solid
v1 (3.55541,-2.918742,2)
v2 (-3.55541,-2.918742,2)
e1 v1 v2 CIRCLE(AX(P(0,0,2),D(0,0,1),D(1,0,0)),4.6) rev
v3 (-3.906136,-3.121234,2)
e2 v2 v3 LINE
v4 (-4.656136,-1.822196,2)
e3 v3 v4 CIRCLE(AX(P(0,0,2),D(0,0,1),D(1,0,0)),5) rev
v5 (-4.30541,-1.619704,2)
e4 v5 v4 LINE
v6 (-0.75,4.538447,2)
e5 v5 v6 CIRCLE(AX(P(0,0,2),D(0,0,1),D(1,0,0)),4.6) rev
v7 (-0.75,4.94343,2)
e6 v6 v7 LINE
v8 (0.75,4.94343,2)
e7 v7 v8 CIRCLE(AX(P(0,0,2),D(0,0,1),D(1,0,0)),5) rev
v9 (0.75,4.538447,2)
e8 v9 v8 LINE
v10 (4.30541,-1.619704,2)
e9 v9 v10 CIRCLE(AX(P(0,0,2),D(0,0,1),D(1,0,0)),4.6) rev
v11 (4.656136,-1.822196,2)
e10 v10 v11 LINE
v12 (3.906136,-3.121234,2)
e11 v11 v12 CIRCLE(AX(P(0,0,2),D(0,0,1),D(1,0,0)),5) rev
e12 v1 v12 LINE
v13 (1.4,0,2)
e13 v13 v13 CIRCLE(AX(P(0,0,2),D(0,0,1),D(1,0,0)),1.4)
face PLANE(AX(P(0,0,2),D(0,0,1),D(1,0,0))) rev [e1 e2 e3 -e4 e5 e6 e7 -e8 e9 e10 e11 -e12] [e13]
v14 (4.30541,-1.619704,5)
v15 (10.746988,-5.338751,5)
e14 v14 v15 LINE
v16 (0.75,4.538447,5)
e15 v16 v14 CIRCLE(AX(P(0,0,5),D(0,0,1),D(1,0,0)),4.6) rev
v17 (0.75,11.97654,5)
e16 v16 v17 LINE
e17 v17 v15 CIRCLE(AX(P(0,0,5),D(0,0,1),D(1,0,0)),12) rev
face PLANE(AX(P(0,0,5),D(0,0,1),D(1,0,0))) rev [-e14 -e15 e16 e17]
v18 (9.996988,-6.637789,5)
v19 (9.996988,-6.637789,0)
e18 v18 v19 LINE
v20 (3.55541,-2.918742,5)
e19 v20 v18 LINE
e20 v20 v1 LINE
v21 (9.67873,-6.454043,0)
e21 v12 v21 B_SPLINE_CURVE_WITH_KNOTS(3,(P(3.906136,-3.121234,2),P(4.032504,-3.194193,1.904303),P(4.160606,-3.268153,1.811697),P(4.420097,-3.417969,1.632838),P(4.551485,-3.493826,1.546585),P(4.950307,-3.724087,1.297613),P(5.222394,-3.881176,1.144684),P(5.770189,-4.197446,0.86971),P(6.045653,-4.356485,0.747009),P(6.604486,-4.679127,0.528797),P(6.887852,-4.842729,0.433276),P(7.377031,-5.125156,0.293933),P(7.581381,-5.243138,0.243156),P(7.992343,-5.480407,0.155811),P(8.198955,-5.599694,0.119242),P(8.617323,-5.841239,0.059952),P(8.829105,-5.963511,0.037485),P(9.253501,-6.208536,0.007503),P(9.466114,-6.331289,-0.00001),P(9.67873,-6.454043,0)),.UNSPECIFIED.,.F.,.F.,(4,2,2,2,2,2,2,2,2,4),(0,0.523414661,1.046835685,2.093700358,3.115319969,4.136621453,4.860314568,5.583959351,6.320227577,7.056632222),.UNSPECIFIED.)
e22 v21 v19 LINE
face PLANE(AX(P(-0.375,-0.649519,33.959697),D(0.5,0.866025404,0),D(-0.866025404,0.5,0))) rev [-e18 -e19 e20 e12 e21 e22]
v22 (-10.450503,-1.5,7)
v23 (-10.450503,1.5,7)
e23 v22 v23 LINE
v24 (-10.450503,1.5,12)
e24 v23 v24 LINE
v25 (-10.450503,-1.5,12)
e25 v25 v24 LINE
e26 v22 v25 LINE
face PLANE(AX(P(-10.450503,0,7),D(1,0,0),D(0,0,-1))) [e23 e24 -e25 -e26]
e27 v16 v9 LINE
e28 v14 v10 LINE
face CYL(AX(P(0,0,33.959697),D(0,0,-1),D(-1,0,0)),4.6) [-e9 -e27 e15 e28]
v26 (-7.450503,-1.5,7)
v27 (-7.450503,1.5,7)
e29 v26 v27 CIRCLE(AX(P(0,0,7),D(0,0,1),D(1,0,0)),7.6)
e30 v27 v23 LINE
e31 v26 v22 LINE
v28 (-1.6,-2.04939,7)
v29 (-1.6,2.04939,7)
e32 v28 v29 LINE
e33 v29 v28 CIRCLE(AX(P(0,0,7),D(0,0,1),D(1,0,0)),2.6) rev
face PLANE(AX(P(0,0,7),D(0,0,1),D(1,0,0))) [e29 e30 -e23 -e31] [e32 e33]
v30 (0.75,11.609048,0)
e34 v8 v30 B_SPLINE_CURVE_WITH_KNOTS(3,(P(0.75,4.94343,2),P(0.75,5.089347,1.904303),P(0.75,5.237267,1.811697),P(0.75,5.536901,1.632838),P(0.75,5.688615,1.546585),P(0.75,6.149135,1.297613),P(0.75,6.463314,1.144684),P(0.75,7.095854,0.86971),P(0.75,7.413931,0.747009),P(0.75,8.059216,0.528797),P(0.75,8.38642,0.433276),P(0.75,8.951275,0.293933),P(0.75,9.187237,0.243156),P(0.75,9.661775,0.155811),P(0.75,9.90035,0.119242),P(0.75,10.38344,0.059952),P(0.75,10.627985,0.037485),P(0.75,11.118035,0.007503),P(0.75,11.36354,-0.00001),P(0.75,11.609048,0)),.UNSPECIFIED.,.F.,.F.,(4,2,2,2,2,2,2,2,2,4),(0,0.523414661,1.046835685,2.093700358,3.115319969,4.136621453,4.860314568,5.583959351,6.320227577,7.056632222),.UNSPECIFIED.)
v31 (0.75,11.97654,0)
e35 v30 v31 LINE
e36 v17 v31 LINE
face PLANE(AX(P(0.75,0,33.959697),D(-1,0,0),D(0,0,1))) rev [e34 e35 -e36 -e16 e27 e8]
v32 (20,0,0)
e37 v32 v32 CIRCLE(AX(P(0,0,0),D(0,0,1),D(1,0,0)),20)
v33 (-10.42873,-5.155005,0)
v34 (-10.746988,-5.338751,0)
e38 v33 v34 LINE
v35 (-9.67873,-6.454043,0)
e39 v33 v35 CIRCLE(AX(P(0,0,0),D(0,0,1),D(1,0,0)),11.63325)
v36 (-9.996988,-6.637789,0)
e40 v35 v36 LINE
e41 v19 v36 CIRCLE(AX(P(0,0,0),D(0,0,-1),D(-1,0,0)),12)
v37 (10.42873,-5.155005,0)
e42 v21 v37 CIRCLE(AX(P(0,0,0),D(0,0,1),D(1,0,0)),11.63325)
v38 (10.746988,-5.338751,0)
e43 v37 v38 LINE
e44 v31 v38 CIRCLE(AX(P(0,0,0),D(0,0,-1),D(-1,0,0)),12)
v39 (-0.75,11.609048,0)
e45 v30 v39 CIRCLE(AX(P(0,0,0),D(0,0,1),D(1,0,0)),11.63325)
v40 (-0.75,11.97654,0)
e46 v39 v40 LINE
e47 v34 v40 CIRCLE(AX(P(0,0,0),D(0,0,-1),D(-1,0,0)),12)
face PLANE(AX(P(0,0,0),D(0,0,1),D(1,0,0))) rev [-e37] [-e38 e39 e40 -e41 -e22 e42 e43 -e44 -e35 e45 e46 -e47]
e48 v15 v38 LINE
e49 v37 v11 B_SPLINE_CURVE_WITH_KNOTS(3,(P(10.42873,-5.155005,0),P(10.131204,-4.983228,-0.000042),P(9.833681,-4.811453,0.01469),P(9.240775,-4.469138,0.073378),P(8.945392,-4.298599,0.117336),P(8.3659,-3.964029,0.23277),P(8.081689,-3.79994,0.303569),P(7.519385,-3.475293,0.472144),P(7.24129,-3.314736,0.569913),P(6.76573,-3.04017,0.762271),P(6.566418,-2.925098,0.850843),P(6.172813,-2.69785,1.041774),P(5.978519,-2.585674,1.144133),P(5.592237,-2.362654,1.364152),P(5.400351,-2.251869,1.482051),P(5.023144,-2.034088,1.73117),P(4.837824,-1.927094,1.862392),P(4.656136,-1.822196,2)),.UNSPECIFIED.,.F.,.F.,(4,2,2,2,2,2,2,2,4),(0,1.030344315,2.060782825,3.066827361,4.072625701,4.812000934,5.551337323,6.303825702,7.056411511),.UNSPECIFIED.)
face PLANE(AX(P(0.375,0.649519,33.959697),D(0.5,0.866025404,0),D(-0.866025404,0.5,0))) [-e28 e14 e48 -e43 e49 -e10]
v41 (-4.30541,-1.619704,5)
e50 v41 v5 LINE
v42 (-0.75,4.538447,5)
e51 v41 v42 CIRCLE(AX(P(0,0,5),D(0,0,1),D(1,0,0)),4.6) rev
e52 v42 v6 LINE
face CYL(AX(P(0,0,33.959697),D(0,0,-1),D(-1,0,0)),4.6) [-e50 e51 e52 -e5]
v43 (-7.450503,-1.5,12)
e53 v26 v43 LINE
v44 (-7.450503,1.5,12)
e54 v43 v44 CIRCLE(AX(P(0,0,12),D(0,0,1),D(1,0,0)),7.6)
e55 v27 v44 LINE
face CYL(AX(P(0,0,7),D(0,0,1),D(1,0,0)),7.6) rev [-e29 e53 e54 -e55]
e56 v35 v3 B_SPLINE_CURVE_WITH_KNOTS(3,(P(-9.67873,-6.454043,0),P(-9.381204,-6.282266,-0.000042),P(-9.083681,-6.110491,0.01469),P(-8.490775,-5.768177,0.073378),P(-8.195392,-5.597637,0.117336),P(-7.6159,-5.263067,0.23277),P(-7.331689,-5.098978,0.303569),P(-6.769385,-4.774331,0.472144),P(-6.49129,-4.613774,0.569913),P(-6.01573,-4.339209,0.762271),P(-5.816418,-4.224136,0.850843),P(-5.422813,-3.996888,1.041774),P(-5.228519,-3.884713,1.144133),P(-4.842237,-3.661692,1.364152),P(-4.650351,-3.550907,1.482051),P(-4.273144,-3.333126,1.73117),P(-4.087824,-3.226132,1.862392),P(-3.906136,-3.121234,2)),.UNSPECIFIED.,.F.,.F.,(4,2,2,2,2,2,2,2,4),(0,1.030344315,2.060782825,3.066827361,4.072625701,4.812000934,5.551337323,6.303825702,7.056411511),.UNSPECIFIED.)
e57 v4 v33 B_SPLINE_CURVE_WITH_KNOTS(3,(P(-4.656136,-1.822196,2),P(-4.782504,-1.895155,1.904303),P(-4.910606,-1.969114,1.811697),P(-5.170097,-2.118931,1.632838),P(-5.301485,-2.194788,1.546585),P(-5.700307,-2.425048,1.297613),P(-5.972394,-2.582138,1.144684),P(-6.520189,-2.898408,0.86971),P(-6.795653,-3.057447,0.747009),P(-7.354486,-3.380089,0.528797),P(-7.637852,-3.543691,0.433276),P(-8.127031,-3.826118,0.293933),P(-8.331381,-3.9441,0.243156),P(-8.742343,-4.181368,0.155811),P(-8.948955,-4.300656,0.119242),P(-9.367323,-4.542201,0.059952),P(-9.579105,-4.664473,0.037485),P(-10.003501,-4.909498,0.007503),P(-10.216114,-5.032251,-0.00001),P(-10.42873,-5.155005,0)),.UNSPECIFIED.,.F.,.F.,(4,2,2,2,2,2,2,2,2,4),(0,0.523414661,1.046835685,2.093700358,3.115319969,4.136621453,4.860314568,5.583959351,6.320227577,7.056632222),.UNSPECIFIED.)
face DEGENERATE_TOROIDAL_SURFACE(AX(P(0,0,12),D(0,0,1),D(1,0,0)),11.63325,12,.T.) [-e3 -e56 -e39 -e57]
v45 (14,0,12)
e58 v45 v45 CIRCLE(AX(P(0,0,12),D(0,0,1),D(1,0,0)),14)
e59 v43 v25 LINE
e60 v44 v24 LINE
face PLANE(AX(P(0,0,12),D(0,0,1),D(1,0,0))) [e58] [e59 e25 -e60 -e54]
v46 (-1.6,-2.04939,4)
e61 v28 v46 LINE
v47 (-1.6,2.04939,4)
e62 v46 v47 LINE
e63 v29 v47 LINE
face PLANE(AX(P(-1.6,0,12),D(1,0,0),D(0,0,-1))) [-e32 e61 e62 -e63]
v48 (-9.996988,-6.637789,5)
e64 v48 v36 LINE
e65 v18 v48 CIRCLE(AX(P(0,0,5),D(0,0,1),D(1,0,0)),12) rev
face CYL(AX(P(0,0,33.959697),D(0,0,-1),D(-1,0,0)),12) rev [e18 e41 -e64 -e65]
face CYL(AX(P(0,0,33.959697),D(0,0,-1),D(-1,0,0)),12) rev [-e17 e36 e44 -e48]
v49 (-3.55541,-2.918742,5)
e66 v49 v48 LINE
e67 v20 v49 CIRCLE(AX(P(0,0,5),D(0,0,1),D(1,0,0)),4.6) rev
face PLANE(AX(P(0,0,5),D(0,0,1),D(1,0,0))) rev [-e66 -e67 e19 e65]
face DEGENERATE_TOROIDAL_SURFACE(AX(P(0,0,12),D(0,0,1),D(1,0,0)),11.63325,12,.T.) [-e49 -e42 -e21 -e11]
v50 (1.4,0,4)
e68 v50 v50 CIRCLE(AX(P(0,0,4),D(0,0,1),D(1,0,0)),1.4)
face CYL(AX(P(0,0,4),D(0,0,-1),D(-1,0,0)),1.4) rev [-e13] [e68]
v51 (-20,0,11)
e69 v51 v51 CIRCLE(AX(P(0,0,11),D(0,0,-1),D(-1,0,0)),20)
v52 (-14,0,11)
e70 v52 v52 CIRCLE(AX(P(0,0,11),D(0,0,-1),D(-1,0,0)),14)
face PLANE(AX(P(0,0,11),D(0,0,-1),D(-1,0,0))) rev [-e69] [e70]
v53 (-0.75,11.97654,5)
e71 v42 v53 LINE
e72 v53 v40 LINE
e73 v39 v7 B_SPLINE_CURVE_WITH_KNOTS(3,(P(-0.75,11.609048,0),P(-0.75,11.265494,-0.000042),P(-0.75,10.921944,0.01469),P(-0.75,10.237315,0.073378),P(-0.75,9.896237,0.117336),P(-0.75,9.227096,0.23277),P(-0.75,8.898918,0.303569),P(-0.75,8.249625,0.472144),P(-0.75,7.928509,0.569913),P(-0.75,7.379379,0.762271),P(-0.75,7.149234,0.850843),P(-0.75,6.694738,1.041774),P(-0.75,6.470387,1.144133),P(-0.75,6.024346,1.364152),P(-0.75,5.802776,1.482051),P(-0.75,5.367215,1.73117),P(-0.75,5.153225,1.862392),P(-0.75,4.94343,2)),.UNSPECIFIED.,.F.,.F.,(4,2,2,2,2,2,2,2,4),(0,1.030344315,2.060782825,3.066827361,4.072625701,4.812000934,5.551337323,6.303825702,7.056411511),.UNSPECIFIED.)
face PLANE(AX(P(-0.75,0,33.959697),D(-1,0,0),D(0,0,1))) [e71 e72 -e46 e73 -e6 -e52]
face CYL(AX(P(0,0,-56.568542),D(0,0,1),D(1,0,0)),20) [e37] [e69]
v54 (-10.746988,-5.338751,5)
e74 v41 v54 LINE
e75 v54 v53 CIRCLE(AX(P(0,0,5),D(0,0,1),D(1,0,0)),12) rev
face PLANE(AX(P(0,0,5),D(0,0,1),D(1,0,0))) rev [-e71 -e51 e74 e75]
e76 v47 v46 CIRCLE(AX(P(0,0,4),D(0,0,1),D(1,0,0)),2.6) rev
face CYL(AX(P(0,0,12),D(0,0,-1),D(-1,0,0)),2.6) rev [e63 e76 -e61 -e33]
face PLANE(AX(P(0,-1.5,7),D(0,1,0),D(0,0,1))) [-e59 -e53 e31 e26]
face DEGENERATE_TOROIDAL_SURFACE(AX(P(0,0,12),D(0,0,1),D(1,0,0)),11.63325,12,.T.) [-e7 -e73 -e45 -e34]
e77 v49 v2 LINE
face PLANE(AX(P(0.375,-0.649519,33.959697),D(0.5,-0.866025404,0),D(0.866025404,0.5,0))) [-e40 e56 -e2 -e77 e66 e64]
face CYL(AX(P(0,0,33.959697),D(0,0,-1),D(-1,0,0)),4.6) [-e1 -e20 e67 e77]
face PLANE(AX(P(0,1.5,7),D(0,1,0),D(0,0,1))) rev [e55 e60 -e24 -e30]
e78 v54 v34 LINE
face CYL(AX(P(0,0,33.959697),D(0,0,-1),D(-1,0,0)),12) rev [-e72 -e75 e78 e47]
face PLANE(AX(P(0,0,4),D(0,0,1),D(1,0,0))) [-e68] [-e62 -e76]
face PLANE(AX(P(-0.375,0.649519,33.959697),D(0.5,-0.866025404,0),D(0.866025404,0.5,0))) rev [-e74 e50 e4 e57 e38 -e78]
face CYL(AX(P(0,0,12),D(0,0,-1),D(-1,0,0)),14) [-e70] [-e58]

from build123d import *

# Parameters (mm, degrees)
SKETCH_1_R          = 13
SKETCH_1_R_2        = 2.6
SKETCH_1_R_3        = 1.4
EXTRUDE_1_DEPTH     = 4
SKETCH_1_3_R        = 13
SKETCH_1_3_R_2      = 2.6
EXTRUDE_2_DEPTH     = 12
EXTRUDE_START       = 11
SKETCH_1_6_R        = 14
SKETCH_1_6_R_2      = 13
EXTRUDE_3_DEPTH     = 1
CUT_EXTRUDE_1_DEPTH = 5
SKETCH_6_R          = 7.6
SKETCH_6_W          = 3
SKETCH_6_H          = 3
CUT_EXTRUDE_5_DEPTH = 5
SKETCH_5_R          = 5
CUT_EXTRUDE_6_DEPTH = 2
FILLET_1_R          = 12
SKETCH_7_R          = 20
SKETCH_7_R_2        = 13
EXTRUDE_5_DEPTH     = 11


with BuildPart() as part:
    # 草图1 → 凸台-拉伸1 (new body)
    # profile 1 of 3: a face of its own
    with BuildSketch(Plane.XY):
        Circle(SKETCH_1_R)
        Circle(SKETCH_1_R_2, mode=Mode.SUBTRACT)
    # profile 2 of 3: a face of its own
    with BuildSketch(Plane.XY):
        with BuildLine():
            Line((-1.6, -2.049390153), (-1.6, 2.049390153))
            ThreePointArc((-1.6, 2.049390153), (-2.6, 0), (-1.6, -2.049390153))
        make_face()
    # profile 3 of 3: a face of its own
    with BuildSketch(Plane.XY):
        with BuildLine():
            ThreePointArc((2.6, 0), (1.140175425, 2.336664289), (-1.6, 2.049390153))
            Line((-1.6, 2.049390153), (-1.6, -2.049390153))
            ThreePointArc((-1.6, -2.049390153), (1.140175425, -2.336664289), (2.6, 0))
        make_face()
        Circle(SKETCH_1_R_3, mode=Mode.SUBTRACT)
    extrude(amount=EXTRUDE_1_DEPTH)

    # 草图1<3> → 凸台-拉伸2 (add)
    # profile 1 of 2: a face of its own
    with BuildSketch(Plane.XY):
        Circle(SKETCH_1_3_R)
        Circle(SKETCH_1_3_R_2, mode=Mode.SUBTRACT)
    # profile 2 of 2: a face of its own
    with BuildSketch(Plane.XY):
        with BuildLine():
            Line((-1.6, -2.049390153), (-1.6, 2.049390153))
            ThreePointArc((-1.6, 2.049390153), (-2.6, 0), (-1.6, -2.049390153))
        make_face()
    extrude(amount=EXTRUDE_2_DEPTH)

    # 草图1<6> → 凸台-拉伸3 (add)
    with BuildSketch(Plane.XY.offset(EXTRUDE_START)):
        Circle(SKETCH_1_6_R)
        Circle(SKETCH_1_6_R_2, mode=Mode.SUBTRACT)
    extrude(amount=EXTRUDE_3_DEPTH)

    # 草图3 → 切除-拉伸1 (cut)
    with BuildSketch(Plane(origin=(0, 0, 0), x_dir=(-1, 0, 0), z_dir=(0, 0, -1))):
        with BuildLine():
            Line((-10.746987514, -5.338750731), (-4.305410284, -1.619704383))
            ThreePointArc((-4.305410284, -1.619704383), (-3.983716857, 2.3), (-0.75, 4.538446871))
            Line((-0.75, 4.538446871), (-0.75, 11.976539567))
            ThreePointArc((-0.75, 11.976539567), (-10.392304845, 6), (-10.746987514, -5.338750731))
        make_face()
        with BuildLine():
            Line((9.996987514, -6.637788836), (3.555410284, -2.918742488))
            ThreePointArc((3.555410284, -2.918742488), (0, -4.6), (-3.555410284, -2.918742488))
            Line((-3.555410284, -2.918742488), (-9.996987514, -6.637788836))
            ThreePointArc((-9.996987514, -6.637788836), (0, -12), (9.996987514, -6.637788836))
        make_face()
        with BuildLine():
            ThreePointArc((4.6, 0), (4.52575338, -0.823138109), (4.305410284, -1.619704383))
            Line((4.305410284, -1.619704383), (10.746987514, -5.338750731))
            ThreePointArc((10.746987514, -5.338750731), (11.682547885, -2.741910814), (12, 0))
            ThreePointArc((12, 0), (8.746427842, 8.215838363), (0.75, 11.976539567))
            Line((0.75, 11.976539567), (0.75, 4.538446871))
            ThreePointArc((0.75, 4.538446871), (3.507848343, 2.975735203), (4.6, 0))
        make_face()
    extrude(amount=-CUT_EXTRUDE_1_DEPTH, mode=Mode.SUBTRACT)

    # 草图6 → 切除-拉伸5 (cut)
    with BuildSketch(Plane.XY.offset(12)):
        Circle(SKETCH_6_R)
        with Locations((-8.950503339, 0)):
            Rectangle(SKETCH_6_W, SKETCH_6_H)
    extrude(amount=-CUT_EXTRUDE_5_DEPTH, mode=Mode.SUBTRACT)

    # 草图5 → 切除-拉伸6 (cut)
    with BuildSketch(Plane(origin=(0, 0, 0), x_dir=(-1, 0, 0), z_dir=(0, 0, -1))):
        Circle(SKETCH_5_R)
    extrude(amount=-CUT_EXTRUDE_6_DEPTH, mode=Mode.SUBTRACT)

    # 圆角1
    # the kernel refuses this fillet: 12 mm, written as the material it takes off along each edge
    with BuildSketch(Plane(origin=(0, 0, 0), x_dir=(-0.0031415874858860904, -0.9999950652018581, 0), z_dir=(0.9999950652018581, -0.0031415874858860904, 0))) as fillet_1_piece_1:
        with BuildLine():
            CenterArc((11.633249581, -12), FILLET_1_R, 90, 33.557309762)
            Line((5, -2), (5, 0))
            Line((5, 0), (11.633249581, 0))
        make_face()
    revolve(axis=Axis((0, 0, 0), (0, 0, -1)), revolution_arc=359.64, mode=Mode.SUBTRACT)
    with BuildSketch(Plane(origin=(0, 0, 0), x_dir=(0.8675919238668026, 0.49727683802998507, 0), z_dir=(-0.49727683802998507, 0.8675919238668026, 0))) as fillet_1_piece_2:
        with BuildLine():
            CenterArc((11.633249581, -12), FILLET_1_R, 90, 33.557309762)
            Line((5, -2), (5, 0))
            Line((5, 0), (11.633249581, 0))
        make_face()
    revolve(axis=Axis((0, 0, 0), (0, 0, -1)), revolution_arc=359.64, mode=Mode.SUBTRACT)
    with BuildSketch(Plane(origin=(0, 0, 0), x_dir=(-0.8644503363809427, 0.5027182271719167, 0), z_dir=(-0.5027182271719167, -0.8644503363809427, 0))) as fillet_1_piece_3:
        with BuildLine():
            CenterArc((11.633249581, -12), FILLET_1_R, 90, 33.557309762)
            Line((5, -2), (5, 0))
            Line((5, 0), (11.633249581, 0))
        make_face()
    revolve(axis=Axis((0, 0, 0), (0, 0, -1)), revolution_arc=359.64, mode=Mode.SUBTRACT)

    # 草图7 → 凸台-拉伸5 (add)
    with BuildSketch(Plane(origin=(0, 0, 11), x_dir=(-1, 0, 0), z_dir=(0, 0, -1)).offset(EXTRUDE_START)):
        with Locations(Location((0, 0, 0), (0, 0, 180))):
            Circle(SKETCH_7_R)
        Circle(SKETCH_7_R_2, mode=Mode.SUBTRACT)
    extrude(amount=-EXTRUDE_5_DEPTH)


solid = part.part
